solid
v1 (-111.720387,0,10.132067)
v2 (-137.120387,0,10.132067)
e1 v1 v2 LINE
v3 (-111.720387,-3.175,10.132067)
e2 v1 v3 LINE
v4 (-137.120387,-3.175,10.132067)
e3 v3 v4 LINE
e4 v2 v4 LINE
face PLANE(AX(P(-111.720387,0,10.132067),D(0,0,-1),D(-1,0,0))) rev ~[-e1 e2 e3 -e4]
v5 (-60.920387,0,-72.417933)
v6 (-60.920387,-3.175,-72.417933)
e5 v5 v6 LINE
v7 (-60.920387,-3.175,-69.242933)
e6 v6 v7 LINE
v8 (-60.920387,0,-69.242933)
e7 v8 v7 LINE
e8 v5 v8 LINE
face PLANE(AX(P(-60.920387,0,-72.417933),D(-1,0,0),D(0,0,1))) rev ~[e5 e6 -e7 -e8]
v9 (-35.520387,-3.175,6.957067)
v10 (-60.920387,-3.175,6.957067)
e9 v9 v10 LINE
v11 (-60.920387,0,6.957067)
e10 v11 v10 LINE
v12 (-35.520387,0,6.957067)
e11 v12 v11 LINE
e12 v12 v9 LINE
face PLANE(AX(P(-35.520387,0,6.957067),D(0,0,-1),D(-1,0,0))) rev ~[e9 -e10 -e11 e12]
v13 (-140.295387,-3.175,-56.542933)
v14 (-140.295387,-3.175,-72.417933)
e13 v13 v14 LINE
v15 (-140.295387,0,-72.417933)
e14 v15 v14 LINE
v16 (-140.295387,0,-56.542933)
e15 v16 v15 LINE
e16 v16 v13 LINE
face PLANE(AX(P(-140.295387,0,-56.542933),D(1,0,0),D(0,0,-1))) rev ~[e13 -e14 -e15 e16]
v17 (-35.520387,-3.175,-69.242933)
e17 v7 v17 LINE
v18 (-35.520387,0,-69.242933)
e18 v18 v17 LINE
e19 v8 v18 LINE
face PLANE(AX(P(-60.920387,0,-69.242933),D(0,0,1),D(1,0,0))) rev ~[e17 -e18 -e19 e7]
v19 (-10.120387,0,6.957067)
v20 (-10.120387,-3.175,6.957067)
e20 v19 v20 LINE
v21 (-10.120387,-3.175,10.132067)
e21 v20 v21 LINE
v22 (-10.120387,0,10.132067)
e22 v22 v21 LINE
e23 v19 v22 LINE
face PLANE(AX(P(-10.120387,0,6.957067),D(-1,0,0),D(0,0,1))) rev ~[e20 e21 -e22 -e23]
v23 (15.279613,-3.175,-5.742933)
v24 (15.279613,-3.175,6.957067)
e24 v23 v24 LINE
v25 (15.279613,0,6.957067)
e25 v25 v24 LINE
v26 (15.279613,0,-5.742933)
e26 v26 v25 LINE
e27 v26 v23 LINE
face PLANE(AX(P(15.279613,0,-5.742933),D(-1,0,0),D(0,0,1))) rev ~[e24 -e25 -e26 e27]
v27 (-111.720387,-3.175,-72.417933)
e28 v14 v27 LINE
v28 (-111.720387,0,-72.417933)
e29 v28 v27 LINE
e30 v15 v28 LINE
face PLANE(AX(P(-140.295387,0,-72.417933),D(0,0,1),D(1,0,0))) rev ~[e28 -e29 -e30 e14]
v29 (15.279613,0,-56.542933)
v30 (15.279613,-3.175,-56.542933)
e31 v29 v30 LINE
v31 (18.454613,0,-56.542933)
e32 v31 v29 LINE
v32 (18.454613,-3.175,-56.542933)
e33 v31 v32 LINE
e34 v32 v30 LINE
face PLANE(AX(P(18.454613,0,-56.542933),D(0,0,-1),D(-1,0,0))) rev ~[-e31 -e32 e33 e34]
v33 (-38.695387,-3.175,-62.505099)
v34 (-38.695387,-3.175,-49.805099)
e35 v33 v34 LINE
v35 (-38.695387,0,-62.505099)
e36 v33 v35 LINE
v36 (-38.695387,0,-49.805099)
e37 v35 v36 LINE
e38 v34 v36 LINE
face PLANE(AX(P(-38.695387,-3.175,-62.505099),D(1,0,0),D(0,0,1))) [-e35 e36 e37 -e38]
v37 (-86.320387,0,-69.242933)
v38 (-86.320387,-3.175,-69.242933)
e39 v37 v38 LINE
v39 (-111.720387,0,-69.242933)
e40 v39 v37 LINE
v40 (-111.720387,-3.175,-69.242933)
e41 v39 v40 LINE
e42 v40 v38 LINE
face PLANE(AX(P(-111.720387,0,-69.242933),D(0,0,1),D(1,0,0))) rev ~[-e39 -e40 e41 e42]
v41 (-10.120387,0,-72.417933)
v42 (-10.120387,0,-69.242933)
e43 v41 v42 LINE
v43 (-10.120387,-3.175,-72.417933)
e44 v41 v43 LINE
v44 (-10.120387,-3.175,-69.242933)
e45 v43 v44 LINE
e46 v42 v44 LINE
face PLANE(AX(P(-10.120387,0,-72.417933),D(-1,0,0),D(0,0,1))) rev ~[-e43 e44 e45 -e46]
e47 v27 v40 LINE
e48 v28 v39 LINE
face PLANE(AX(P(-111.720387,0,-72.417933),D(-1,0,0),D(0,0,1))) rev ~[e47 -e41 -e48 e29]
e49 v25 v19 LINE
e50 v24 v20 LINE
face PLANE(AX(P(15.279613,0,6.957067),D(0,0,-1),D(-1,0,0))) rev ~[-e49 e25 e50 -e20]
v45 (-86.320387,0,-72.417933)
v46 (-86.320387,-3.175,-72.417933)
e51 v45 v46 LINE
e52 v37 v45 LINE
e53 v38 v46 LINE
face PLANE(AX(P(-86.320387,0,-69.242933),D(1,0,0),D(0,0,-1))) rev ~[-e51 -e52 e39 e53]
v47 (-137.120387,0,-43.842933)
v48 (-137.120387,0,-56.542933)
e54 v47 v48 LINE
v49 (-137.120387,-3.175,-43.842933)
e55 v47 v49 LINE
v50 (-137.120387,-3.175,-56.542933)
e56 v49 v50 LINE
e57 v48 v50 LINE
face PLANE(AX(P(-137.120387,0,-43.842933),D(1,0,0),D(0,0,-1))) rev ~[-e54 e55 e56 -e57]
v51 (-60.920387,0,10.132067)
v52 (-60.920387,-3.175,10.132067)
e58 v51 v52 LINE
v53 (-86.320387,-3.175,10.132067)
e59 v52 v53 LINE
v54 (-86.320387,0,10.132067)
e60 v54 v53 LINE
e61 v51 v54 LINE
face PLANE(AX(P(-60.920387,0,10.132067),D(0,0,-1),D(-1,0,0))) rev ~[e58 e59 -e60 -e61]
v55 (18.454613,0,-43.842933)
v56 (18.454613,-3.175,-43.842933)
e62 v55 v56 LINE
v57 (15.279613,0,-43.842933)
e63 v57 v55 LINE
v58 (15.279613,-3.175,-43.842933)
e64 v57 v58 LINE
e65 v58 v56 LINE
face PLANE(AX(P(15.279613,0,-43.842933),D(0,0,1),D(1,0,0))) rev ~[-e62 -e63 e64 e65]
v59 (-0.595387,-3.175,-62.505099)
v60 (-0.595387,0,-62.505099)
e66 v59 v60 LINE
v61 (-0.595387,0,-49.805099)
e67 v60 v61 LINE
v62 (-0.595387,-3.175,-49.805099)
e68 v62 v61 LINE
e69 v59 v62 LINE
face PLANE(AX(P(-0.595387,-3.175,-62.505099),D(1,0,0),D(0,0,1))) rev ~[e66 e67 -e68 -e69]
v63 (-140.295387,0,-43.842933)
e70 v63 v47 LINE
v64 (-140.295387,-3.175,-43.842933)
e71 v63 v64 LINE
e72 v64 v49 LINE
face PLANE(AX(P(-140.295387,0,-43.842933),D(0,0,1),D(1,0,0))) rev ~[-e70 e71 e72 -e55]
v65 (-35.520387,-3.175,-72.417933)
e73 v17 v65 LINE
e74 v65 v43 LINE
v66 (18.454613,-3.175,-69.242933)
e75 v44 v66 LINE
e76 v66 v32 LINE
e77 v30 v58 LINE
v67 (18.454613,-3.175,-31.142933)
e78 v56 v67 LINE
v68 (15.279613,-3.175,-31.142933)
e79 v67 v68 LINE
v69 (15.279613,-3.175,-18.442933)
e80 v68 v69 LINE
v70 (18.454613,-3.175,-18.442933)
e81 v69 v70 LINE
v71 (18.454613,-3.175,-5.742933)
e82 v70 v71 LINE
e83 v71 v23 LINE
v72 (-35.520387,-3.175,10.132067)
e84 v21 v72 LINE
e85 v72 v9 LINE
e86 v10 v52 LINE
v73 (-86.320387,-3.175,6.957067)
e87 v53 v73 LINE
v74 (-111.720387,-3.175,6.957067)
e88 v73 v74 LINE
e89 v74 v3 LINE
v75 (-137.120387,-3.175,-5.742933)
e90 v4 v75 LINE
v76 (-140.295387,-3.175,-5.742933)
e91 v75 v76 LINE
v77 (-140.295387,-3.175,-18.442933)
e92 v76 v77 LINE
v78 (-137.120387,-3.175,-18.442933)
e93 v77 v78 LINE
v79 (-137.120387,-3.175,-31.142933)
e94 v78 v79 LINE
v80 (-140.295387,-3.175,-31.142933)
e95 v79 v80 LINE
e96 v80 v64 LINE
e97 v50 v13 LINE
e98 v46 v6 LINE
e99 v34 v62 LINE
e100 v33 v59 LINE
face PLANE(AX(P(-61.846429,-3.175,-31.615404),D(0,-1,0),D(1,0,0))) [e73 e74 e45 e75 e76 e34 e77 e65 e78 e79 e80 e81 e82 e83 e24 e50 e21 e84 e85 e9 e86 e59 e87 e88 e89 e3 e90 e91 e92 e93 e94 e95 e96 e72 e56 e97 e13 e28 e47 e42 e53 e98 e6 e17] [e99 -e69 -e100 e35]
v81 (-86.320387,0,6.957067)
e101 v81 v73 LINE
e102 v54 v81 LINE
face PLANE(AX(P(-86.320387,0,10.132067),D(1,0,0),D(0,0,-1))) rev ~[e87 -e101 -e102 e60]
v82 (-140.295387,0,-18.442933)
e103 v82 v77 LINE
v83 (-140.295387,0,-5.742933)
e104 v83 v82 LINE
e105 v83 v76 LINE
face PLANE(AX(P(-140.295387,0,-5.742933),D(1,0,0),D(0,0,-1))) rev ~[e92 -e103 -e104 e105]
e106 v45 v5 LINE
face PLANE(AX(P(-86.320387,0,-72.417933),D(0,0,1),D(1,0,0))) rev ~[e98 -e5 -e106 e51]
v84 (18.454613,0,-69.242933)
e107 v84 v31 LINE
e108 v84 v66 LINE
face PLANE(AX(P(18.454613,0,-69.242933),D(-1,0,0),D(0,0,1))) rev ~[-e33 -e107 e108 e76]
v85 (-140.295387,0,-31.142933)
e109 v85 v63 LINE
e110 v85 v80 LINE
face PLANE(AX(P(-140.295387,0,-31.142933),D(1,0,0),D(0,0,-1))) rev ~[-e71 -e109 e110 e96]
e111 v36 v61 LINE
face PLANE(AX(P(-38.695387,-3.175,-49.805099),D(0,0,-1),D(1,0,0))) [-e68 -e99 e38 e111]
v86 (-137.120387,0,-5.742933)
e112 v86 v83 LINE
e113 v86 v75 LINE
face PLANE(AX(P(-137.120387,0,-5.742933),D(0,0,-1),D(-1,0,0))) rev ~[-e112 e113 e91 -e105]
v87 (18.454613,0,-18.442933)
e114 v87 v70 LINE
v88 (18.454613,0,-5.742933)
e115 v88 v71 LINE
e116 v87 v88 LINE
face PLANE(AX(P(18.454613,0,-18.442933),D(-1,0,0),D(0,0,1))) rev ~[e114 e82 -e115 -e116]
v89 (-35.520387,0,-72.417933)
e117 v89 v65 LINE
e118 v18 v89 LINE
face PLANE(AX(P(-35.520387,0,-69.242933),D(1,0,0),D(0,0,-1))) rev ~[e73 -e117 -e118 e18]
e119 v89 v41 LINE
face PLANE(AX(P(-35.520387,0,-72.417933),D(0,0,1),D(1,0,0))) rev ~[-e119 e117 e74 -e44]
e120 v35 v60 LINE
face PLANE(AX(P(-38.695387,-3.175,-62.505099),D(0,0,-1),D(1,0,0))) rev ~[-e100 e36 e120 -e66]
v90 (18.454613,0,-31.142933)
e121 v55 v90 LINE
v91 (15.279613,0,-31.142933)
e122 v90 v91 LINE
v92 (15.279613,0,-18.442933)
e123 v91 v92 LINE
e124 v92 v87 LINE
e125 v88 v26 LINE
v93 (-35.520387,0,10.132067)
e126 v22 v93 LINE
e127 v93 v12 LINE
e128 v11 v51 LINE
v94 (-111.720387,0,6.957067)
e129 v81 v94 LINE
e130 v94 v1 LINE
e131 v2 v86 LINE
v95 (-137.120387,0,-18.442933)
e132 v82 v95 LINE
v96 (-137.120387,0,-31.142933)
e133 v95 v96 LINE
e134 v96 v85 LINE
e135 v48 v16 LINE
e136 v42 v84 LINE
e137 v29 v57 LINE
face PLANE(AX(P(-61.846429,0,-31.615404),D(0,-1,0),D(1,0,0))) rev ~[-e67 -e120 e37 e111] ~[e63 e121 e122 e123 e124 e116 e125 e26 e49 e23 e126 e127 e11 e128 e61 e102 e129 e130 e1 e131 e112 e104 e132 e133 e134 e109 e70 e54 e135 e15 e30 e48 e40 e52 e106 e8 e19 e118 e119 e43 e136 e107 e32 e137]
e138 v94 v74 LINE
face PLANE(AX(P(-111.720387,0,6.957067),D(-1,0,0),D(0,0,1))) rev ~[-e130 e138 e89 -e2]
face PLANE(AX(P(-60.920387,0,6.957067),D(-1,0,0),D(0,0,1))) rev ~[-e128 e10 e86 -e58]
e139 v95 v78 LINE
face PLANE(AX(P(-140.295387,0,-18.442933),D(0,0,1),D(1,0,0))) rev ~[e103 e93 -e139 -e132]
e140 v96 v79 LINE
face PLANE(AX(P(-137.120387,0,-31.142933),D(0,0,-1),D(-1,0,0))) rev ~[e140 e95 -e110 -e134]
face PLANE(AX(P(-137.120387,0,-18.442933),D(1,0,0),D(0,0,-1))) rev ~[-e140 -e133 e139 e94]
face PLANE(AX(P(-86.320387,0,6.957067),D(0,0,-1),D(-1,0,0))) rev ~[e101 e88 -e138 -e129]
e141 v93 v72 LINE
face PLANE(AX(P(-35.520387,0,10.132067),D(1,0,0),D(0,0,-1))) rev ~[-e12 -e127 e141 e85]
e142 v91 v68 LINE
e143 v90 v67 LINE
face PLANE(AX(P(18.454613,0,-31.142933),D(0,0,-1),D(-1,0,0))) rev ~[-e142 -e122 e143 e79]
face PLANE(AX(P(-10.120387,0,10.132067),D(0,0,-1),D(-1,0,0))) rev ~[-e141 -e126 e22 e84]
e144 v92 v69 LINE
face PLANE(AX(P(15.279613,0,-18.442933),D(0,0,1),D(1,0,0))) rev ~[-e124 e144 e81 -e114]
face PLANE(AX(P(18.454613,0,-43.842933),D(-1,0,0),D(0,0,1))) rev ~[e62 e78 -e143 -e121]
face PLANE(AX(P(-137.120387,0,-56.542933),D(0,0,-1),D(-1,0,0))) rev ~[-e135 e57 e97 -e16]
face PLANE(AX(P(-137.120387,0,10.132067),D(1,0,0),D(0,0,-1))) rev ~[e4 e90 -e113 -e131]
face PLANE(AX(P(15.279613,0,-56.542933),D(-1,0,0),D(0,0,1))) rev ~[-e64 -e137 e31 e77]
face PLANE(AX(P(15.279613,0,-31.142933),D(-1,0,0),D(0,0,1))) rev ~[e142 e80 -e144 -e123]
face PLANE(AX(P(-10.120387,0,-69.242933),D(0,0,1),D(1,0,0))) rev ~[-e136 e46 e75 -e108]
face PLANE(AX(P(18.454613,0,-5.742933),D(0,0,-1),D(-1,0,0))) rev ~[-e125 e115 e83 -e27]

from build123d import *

# Parameters (mm, degrees)
F1_DEPTH = 3.175
F2_W     = 38.1
F2_H     = 12.7
F3_DEPTH = 25.4


# Not quite as in the source:
# - a length typed as a fraction of an inch, garbled in the dataset ("3 / 203.2 mm" for 3/8 in), is restored


with BuildPart() as f1:
    # F0 (on Front) → F1 (new body)
    with BuildSketch(Plane.XZ):
        Polygon((15.2796131081, -5.7429333596), (15.2796131081, 6.9570666404), (-10.1203868919, 6.9570666404), (-10.1203868919, 10.1320666404), (-35.5203868919, 10.1320666404), (-35.5203868919, 6.9570666404), (-60.9203868919, 6.9570666404), (-60.9203868919, 10.1320666404), (-86.3203868919, 10.1320666404), (-86.3203868919, 6.9570666404), (-111.7203868919, 6.9570666404), (-111.7203868919, 10.1320666404), (-137.1203868919, 10.1320666404), (-137.1203868919, 6.9570666404), (-137.1203868919, -5.7429333596), (-140.2953868919, -5.7429333596), (-140.2953868919, -18.4429333596), (-137.1203868919, -18.4429333596), (-137.1203868919, -31.1429333596), (-140.2953868919, -31.1429333596), (-140.2953868919, -43.8429333596), (-137.1203868919, -43.8429333596), (-137.1203868919, -56.5429333596), (-140.2953868919, -56.5429333596), (-140.2953868919, -69.2429333596), (-140.2953868919, -72.4179333596), (-137.1203868919, -72.4179333596), (-111.7203868919, -72.4179333596), (-111.7203868919, -69.2429333596), (-86.3203868919, -69.2429333596), (-86.3203868919, -72.4179333596), (-60.9203868919, -72.4179333596), (-60.9203868919, -69.2429333596), (-35.5203868919, -69.2429333596), (-35.5203868919, -72.4179333596), (-10.1203868919, -72.4179333596), (-10.1203868919, -69.2429333596), (15.2796131081, -69.2429333596), (18.4546131081, -69.2429333596), (18.4546131081, -56.5429333596), (15.2796131081, -56.5429333596), (15.2796131081, -43.8429333596), (18.4546131081, -43.8429333596), (18.4546131081, -31.1429333596), (15.2796131081, -31.1429333596), (15.2796131081, -18.4429333596), (18.4546131081, -18.4429333596), (18.4546131081, -5.7429333596), align=None)
    extrude(amount=F1_DEPTH)

    # F2 (on face) → F3 (cut)
    with BuildSketch(Plane.XZ.offset(3.175)):
        with Locations((-19.6453868919, -56.1550986022)):
            Rectangle(F2_W, F2_H)
    extrude(amount=-F3_DEPTH, mode=Mode.SUBTRACT)


solid = f1.part
